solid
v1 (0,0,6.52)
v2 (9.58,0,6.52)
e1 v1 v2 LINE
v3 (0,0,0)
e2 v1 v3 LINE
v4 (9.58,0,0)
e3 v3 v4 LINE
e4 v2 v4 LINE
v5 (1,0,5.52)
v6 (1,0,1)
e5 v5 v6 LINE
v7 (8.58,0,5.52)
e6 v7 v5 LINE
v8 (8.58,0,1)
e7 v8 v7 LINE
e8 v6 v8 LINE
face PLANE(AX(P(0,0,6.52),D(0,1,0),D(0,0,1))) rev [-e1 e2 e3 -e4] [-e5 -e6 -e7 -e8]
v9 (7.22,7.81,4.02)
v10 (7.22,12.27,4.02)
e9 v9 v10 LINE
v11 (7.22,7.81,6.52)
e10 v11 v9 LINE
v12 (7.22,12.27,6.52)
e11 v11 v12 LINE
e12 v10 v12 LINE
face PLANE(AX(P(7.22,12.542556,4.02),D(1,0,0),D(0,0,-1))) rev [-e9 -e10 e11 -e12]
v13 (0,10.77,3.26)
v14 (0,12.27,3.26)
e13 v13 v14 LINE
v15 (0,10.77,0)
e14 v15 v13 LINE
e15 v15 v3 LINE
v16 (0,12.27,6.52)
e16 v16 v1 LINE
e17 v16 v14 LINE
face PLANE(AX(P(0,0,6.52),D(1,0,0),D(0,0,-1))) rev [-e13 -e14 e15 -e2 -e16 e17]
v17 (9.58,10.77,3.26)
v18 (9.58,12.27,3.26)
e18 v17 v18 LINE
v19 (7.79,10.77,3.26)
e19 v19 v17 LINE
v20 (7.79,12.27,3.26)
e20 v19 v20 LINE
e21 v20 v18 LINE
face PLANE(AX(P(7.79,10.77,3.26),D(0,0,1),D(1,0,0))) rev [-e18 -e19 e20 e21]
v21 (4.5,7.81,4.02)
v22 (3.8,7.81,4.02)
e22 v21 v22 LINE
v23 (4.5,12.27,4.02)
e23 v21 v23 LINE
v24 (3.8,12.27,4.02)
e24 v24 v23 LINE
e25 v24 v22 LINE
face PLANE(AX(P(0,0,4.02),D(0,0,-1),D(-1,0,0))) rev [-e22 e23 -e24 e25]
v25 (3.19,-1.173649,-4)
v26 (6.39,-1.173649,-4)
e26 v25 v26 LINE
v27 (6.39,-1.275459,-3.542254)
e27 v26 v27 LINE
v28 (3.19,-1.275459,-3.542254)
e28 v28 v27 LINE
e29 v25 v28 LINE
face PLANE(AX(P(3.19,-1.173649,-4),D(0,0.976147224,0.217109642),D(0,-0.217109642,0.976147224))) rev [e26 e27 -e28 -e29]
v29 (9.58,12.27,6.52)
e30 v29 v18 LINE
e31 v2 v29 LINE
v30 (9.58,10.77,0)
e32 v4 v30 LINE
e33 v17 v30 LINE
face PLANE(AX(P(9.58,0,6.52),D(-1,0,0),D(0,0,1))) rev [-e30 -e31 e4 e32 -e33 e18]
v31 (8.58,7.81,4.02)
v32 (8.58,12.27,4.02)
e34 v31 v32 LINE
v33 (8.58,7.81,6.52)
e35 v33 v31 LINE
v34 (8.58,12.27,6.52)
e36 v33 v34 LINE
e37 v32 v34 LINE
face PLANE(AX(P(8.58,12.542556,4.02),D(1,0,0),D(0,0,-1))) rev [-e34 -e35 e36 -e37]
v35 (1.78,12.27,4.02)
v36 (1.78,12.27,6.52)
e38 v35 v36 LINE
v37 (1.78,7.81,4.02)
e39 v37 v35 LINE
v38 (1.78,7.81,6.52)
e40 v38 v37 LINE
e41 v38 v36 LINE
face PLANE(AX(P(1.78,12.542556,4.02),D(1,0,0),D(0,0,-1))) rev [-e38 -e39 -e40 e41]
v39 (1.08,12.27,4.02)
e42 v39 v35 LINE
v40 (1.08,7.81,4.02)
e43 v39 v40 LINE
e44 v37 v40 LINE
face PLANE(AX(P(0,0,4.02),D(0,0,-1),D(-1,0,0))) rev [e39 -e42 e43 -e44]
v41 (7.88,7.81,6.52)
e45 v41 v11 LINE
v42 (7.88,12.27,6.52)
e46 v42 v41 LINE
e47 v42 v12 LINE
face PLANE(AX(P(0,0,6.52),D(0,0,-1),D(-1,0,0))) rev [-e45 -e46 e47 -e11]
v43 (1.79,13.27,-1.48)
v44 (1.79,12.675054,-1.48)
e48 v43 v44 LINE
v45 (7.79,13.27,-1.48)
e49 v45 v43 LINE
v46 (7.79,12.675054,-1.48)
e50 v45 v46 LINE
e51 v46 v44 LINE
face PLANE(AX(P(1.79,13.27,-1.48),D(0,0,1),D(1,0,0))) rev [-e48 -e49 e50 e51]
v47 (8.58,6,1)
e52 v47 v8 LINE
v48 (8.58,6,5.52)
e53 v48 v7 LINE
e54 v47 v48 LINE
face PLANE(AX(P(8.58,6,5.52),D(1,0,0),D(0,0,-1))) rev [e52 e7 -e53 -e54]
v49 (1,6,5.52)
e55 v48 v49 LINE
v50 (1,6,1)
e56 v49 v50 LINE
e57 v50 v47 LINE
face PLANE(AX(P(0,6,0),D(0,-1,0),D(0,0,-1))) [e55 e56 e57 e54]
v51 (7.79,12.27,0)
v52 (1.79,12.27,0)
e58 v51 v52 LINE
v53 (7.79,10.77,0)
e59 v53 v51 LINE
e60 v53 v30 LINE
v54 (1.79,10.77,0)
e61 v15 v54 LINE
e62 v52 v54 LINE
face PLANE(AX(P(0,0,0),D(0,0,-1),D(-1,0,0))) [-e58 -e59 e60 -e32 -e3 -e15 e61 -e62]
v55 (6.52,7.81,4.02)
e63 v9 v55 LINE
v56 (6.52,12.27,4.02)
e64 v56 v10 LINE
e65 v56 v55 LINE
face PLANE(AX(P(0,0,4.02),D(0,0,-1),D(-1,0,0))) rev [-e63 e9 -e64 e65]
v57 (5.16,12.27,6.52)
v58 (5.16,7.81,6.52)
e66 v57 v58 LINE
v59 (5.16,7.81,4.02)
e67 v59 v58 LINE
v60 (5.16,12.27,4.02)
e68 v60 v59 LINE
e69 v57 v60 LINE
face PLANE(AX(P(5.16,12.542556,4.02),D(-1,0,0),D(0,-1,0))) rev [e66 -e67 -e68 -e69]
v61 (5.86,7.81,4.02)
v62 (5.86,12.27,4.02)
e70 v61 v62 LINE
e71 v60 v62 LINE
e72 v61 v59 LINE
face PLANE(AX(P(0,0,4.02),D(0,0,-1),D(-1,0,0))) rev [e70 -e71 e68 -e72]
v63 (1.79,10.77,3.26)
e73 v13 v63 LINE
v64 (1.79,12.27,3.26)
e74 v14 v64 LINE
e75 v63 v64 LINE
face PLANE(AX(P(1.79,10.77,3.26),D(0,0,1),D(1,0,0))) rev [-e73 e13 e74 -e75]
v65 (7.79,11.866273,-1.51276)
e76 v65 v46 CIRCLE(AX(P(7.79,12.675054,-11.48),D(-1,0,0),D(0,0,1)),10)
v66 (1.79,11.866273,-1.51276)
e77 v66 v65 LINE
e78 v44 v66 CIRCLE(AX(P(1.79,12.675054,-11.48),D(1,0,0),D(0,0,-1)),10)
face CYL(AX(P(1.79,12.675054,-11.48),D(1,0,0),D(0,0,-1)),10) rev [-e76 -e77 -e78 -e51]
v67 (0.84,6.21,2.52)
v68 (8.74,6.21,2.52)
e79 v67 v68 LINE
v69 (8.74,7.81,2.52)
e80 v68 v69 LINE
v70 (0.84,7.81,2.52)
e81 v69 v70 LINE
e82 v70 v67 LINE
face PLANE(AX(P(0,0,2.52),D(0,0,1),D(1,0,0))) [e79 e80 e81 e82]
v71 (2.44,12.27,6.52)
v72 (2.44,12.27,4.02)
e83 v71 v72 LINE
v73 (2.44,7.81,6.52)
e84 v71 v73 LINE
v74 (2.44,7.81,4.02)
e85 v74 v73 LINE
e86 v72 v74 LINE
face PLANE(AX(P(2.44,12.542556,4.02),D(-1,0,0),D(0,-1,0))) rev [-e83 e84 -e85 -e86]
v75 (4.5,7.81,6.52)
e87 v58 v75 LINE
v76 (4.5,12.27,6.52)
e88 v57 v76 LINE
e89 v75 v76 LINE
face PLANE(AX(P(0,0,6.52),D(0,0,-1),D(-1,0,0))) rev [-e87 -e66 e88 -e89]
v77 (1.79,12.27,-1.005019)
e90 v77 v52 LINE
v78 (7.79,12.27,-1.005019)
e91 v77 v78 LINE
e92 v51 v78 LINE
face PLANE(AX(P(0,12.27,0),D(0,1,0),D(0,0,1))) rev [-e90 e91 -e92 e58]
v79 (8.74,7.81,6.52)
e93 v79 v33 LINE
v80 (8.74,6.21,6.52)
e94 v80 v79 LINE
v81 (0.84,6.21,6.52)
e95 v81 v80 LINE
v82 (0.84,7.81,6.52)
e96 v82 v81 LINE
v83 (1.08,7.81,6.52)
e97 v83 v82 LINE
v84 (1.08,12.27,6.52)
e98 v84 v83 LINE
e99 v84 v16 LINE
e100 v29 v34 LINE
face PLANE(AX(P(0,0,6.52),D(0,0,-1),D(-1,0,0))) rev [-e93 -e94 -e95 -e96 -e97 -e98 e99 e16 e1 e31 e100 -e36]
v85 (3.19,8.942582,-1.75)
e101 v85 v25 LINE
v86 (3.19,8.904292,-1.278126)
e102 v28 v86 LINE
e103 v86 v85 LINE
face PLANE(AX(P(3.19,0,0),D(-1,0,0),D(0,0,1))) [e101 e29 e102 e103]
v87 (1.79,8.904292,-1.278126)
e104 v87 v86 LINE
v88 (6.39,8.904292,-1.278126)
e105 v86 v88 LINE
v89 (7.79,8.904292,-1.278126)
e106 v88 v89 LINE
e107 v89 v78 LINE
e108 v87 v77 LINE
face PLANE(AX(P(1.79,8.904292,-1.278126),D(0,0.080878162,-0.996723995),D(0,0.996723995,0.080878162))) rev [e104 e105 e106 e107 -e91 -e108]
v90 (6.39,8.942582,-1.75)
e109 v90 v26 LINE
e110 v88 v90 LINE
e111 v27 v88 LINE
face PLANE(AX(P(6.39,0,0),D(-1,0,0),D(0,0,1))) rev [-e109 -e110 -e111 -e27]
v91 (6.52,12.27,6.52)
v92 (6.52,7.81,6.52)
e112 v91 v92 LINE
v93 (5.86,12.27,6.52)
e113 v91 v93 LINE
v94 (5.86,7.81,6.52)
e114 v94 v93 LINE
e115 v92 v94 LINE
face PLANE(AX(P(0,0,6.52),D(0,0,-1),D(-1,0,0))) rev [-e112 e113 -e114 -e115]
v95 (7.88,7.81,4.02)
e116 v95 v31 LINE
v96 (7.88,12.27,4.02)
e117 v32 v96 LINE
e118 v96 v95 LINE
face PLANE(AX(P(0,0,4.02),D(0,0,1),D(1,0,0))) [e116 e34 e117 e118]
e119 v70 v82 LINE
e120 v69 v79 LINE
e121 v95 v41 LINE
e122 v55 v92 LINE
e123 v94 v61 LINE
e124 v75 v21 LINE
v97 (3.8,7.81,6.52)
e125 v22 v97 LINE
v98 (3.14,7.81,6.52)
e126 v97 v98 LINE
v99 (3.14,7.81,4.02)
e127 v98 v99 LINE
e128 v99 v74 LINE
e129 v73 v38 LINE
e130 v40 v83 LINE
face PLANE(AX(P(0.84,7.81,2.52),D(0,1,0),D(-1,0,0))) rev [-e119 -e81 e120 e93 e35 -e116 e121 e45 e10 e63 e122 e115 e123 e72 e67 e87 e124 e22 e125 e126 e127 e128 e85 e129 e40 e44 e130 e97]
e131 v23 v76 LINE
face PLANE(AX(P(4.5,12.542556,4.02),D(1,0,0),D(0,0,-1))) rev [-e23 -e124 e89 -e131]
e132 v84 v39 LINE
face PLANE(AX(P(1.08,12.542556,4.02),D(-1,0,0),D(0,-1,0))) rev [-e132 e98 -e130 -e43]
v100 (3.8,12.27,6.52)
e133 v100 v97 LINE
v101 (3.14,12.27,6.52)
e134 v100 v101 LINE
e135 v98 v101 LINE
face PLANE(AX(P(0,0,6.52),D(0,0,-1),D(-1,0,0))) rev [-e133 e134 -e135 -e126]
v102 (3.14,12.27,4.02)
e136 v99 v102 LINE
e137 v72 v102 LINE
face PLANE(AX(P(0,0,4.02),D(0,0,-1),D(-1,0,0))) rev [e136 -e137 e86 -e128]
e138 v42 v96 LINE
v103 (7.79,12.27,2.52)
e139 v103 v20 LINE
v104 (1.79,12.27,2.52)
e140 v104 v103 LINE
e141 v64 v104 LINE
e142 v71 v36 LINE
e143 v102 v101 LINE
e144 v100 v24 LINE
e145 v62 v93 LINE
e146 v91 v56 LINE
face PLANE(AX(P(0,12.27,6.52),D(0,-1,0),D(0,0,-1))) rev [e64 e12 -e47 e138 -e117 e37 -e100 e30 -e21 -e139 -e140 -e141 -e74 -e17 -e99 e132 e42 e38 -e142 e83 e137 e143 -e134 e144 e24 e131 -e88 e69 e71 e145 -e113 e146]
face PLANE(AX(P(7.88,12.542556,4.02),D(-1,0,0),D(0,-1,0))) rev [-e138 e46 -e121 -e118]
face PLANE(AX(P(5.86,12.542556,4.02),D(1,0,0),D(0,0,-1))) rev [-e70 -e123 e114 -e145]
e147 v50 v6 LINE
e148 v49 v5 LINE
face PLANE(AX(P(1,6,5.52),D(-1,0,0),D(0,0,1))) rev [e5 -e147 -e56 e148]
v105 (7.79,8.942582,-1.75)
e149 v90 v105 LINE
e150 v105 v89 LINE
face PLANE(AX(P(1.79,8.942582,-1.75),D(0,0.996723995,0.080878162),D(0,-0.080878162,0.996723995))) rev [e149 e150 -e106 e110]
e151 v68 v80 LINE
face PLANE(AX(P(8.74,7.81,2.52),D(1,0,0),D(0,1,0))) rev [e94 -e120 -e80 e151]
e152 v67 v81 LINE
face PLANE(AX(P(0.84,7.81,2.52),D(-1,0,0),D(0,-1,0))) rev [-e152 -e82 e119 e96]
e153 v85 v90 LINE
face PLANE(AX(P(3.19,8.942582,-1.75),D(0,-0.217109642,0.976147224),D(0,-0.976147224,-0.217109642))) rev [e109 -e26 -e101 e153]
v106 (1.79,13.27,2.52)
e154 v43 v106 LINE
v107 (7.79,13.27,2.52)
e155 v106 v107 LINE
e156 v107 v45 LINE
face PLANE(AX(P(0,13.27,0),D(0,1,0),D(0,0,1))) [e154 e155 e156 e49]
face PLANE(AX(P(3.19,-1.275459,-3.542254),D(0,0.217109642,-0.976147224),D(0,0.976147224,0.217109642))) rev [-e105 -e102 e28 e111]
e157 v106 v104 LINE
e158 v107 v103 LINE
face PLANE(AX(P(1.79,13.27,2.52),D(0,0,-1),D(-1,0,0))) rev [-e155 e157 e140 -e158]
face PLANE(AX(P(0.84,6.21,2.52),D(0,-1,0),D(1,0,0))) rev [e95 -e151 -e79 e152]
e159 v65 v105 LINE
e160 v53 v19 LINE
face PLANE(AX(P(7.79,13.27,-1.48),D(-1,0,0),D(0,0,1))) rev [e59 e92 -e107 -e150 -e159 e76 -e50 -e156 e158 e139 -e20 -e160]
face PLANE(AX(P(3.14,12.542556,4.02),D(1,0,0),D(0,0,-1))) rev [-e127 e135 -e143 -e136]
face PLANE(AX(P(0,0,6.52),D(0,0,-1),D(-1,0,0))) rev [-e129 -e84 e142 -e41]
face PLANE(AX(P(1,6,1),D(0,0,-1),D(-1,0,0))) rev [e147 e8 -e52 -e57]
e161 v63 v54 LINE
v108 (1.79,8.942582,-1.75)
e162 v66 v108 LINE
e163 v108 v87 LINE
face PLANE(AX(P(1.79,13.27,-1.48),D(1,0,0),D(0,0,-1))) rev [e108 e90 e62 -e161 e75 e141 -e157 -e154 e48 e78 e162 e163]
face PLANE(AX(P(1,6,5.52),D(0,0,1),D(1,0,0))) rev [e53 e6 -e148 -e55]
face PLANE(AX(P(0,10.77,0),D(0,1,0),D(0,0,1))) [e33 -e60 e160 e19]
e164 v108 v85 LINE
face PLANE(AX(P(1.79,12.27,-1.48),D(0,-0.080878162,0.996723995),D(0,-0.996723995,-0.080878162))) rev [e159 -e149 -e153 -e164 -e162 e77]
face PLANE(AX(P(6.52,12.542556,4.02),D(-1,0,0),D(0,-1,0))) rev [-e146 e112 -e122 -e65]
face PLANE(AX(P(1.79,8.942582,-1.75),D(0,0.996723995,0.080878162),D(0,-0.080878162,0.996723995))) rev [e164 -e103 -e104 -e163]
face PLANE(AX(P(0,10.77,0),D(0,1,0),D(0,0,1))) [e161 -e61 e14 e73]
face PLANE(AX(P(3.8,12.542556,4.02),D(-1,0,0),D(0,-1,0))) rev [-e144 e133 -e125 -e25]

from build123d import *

# Parameters (mm, degrees)
SKETCH_1_W          = 9.58
SKETCH_1_H          = 12.27
EXTRUDE_1_DEPTH     = 6.52
SKETCH_2_W          = 7.9
SKETCH_2_H          = 1.6
CUT_EXTRUDE_1_DEPTH = 4
SKETCH_3_W          = 0.7
SKETCH_3_H          = 5.068026785
CUT_EXTRUDE_2_DEPTH = 2.5
SKETCH_4_W          = 6
SKETCH_4_H          = 4
EXTRUDE_2_DEPTH     = 1
SKETCH_5_W          = 1.79
SKETCH_5_H          = 3.771756959
CUT_EXTRUDE_3_DEPTH = 1.5
EXTRUDE_3_DEPTH     = 3
EXTRUDE_4_DEPTH     = 1.6
FILLET_1_R          = 10
SKETCH_8_W          = 7.58
SKETCH_8_H          = 4.52
CUT_EXTRUDE_4_DEPTH = 6


with BuildPart() as part:
    # 草图1 → 凸台-拉伸1 (new body)
    with BuildSketch(Plane.XY):
        with Locations((4.79, 6.135)):
            Rectangle(SKETCH_1_W, SKETCH_1_H)
    extrude(amount=EXTRUDE_1_DEPTH)

    # 草图2 → 切除-拉伸1 (cut)
    with BuildSketch(Plane.XY.offset(6.52)):
        with Locations((4.79, 7.01)):
            Rectangle(SKETCH_2_W, SKETCH_2_H)
    extrude(amount=-CUT_EXTRUDE_1_DEPTH, mode=Mode.SUBTRACT)

    # 草图3 → 切除-拉伸2 (cut)
    with BuildSketch(Plane.XY.offset(6.52)):
        with Locations((8.23, 10.008542357)):
            Rectangle(SKETCH_3_W, SKETCH_3_H)
        with Locations((6.87, 10.008542357)):
            Rectangle(SKETCH_3_W, SKETCH_3_H)
        with Locations((5.51, 10.008542357)):
            Rectangle(SKETCH_3_W, SKETCH_3_H)
        with Locations((4.15, 10.008542357)):
            Rectangle(SKETCH_3_W, SKETCH_3_H)
        with Locations((2.79, 10.008542357)):
            Rectangle(SKETCH_3_W, SKETCH_3_H)
        with Locations((1.43, 10.008542357)):
            Rectangle(SKETCH_3_W, SKETCH_3_H)
    extrude(amount=-CUT_EXTRUDE_2_DEPTH, mode=Mode.SUBTRACT)

    # 草图4 → 凸台-拉伸2 (add)
    with BuildSketch(Plane(origin=(0, 12.27, 0), x_dir=(1, 0, 0), z_dir=(0, 1, 0))):
        with Locations((4.79, -0.52)):
            Rectangle(SKETCH_4_W, SKETCH_4_H)
    extrude(amount=EXTRUDE_2_DEPTH)

    # 草图5 → 切除-拉伸3 (cut)
    with BuildSketch(Plane(origin=(0, 12.27, 0), x_dir=(1, 0, 0), z_dir=(0, 1, 0))):
        with Locations((8.685, -1.374121521)):
            Rectangle(SKETCH_5_W, SKETCH_5_H)
        with Locations((0.895, -1.374121521)):
            Rectangle(SKETCH_5_W, SKETCH_5_H)
    extrude(amount=-CUT_EXTRUDE_3_DEPTH, mode=Mode.SUBTRACT)

    # 草图6 → 凸台-拉伸3 (add, symmetric)
    with BuildSketch(Plane.ZY.offset(-4.79)):
        Polygon((-1.48, 12.27), (-1.75, 8.942581669), (-1.278125841, 8.904291917), (-1.005018858, 12.27), align=None)
    extrude(amount=EXTRUDE_3_DEPTH, both=True)

    # 草图7 → 凸台-拉伸4 (add, symmetric)
    with BuildSketch(Plane.ZY.offset(-4.79)):
        Polygon((-1.75, 8.942581669), (-4, -1.173649155), (-3.542253598, -1.275458754), (-1.278125841, 8.904291917), align=None)
    extrude(amount=EXTRUDE_4_DEPTH, both=True)

    # 圆角1
    # the kernel refuses this fillet: 10 mm, written as the material it adds along each edge
    with BuildSketch(Plane(origin=(1.79, 12.27, -1.48), x_dir=(0, -0.9967239953538545, -0.08087816198362402), z_dir=(1, 0, 0))) as fillet_1_piece_1:
        with BuildLine():
            CenterArc((FILLET_1_R * 0.0405054289786, FILLET_1_R), FILLET_1_R, 265.360955713, 4.639044287)
            Line((-FILLET_1_R * 0.040372733005, FILLET_1_R * 0.00327600464615), (0, 0))
            Line((0, 0), (FILLET_1_R * 0.0405054289786, 0))
        make_face()
    extrude(amount=6)

    # 草图8 → 切除-拉伸4 (cut)
    with BuildSketch(Plane.XZ):
        with Locations((4.79, 3.26)):
            Rectangle(SKETCH_8_W, SKETCH_8_H)
    extrude(amount=-CUT_EXTRUDE_4_DEPTH, mode=Mode.SUBTRACT)


solid = part.part
